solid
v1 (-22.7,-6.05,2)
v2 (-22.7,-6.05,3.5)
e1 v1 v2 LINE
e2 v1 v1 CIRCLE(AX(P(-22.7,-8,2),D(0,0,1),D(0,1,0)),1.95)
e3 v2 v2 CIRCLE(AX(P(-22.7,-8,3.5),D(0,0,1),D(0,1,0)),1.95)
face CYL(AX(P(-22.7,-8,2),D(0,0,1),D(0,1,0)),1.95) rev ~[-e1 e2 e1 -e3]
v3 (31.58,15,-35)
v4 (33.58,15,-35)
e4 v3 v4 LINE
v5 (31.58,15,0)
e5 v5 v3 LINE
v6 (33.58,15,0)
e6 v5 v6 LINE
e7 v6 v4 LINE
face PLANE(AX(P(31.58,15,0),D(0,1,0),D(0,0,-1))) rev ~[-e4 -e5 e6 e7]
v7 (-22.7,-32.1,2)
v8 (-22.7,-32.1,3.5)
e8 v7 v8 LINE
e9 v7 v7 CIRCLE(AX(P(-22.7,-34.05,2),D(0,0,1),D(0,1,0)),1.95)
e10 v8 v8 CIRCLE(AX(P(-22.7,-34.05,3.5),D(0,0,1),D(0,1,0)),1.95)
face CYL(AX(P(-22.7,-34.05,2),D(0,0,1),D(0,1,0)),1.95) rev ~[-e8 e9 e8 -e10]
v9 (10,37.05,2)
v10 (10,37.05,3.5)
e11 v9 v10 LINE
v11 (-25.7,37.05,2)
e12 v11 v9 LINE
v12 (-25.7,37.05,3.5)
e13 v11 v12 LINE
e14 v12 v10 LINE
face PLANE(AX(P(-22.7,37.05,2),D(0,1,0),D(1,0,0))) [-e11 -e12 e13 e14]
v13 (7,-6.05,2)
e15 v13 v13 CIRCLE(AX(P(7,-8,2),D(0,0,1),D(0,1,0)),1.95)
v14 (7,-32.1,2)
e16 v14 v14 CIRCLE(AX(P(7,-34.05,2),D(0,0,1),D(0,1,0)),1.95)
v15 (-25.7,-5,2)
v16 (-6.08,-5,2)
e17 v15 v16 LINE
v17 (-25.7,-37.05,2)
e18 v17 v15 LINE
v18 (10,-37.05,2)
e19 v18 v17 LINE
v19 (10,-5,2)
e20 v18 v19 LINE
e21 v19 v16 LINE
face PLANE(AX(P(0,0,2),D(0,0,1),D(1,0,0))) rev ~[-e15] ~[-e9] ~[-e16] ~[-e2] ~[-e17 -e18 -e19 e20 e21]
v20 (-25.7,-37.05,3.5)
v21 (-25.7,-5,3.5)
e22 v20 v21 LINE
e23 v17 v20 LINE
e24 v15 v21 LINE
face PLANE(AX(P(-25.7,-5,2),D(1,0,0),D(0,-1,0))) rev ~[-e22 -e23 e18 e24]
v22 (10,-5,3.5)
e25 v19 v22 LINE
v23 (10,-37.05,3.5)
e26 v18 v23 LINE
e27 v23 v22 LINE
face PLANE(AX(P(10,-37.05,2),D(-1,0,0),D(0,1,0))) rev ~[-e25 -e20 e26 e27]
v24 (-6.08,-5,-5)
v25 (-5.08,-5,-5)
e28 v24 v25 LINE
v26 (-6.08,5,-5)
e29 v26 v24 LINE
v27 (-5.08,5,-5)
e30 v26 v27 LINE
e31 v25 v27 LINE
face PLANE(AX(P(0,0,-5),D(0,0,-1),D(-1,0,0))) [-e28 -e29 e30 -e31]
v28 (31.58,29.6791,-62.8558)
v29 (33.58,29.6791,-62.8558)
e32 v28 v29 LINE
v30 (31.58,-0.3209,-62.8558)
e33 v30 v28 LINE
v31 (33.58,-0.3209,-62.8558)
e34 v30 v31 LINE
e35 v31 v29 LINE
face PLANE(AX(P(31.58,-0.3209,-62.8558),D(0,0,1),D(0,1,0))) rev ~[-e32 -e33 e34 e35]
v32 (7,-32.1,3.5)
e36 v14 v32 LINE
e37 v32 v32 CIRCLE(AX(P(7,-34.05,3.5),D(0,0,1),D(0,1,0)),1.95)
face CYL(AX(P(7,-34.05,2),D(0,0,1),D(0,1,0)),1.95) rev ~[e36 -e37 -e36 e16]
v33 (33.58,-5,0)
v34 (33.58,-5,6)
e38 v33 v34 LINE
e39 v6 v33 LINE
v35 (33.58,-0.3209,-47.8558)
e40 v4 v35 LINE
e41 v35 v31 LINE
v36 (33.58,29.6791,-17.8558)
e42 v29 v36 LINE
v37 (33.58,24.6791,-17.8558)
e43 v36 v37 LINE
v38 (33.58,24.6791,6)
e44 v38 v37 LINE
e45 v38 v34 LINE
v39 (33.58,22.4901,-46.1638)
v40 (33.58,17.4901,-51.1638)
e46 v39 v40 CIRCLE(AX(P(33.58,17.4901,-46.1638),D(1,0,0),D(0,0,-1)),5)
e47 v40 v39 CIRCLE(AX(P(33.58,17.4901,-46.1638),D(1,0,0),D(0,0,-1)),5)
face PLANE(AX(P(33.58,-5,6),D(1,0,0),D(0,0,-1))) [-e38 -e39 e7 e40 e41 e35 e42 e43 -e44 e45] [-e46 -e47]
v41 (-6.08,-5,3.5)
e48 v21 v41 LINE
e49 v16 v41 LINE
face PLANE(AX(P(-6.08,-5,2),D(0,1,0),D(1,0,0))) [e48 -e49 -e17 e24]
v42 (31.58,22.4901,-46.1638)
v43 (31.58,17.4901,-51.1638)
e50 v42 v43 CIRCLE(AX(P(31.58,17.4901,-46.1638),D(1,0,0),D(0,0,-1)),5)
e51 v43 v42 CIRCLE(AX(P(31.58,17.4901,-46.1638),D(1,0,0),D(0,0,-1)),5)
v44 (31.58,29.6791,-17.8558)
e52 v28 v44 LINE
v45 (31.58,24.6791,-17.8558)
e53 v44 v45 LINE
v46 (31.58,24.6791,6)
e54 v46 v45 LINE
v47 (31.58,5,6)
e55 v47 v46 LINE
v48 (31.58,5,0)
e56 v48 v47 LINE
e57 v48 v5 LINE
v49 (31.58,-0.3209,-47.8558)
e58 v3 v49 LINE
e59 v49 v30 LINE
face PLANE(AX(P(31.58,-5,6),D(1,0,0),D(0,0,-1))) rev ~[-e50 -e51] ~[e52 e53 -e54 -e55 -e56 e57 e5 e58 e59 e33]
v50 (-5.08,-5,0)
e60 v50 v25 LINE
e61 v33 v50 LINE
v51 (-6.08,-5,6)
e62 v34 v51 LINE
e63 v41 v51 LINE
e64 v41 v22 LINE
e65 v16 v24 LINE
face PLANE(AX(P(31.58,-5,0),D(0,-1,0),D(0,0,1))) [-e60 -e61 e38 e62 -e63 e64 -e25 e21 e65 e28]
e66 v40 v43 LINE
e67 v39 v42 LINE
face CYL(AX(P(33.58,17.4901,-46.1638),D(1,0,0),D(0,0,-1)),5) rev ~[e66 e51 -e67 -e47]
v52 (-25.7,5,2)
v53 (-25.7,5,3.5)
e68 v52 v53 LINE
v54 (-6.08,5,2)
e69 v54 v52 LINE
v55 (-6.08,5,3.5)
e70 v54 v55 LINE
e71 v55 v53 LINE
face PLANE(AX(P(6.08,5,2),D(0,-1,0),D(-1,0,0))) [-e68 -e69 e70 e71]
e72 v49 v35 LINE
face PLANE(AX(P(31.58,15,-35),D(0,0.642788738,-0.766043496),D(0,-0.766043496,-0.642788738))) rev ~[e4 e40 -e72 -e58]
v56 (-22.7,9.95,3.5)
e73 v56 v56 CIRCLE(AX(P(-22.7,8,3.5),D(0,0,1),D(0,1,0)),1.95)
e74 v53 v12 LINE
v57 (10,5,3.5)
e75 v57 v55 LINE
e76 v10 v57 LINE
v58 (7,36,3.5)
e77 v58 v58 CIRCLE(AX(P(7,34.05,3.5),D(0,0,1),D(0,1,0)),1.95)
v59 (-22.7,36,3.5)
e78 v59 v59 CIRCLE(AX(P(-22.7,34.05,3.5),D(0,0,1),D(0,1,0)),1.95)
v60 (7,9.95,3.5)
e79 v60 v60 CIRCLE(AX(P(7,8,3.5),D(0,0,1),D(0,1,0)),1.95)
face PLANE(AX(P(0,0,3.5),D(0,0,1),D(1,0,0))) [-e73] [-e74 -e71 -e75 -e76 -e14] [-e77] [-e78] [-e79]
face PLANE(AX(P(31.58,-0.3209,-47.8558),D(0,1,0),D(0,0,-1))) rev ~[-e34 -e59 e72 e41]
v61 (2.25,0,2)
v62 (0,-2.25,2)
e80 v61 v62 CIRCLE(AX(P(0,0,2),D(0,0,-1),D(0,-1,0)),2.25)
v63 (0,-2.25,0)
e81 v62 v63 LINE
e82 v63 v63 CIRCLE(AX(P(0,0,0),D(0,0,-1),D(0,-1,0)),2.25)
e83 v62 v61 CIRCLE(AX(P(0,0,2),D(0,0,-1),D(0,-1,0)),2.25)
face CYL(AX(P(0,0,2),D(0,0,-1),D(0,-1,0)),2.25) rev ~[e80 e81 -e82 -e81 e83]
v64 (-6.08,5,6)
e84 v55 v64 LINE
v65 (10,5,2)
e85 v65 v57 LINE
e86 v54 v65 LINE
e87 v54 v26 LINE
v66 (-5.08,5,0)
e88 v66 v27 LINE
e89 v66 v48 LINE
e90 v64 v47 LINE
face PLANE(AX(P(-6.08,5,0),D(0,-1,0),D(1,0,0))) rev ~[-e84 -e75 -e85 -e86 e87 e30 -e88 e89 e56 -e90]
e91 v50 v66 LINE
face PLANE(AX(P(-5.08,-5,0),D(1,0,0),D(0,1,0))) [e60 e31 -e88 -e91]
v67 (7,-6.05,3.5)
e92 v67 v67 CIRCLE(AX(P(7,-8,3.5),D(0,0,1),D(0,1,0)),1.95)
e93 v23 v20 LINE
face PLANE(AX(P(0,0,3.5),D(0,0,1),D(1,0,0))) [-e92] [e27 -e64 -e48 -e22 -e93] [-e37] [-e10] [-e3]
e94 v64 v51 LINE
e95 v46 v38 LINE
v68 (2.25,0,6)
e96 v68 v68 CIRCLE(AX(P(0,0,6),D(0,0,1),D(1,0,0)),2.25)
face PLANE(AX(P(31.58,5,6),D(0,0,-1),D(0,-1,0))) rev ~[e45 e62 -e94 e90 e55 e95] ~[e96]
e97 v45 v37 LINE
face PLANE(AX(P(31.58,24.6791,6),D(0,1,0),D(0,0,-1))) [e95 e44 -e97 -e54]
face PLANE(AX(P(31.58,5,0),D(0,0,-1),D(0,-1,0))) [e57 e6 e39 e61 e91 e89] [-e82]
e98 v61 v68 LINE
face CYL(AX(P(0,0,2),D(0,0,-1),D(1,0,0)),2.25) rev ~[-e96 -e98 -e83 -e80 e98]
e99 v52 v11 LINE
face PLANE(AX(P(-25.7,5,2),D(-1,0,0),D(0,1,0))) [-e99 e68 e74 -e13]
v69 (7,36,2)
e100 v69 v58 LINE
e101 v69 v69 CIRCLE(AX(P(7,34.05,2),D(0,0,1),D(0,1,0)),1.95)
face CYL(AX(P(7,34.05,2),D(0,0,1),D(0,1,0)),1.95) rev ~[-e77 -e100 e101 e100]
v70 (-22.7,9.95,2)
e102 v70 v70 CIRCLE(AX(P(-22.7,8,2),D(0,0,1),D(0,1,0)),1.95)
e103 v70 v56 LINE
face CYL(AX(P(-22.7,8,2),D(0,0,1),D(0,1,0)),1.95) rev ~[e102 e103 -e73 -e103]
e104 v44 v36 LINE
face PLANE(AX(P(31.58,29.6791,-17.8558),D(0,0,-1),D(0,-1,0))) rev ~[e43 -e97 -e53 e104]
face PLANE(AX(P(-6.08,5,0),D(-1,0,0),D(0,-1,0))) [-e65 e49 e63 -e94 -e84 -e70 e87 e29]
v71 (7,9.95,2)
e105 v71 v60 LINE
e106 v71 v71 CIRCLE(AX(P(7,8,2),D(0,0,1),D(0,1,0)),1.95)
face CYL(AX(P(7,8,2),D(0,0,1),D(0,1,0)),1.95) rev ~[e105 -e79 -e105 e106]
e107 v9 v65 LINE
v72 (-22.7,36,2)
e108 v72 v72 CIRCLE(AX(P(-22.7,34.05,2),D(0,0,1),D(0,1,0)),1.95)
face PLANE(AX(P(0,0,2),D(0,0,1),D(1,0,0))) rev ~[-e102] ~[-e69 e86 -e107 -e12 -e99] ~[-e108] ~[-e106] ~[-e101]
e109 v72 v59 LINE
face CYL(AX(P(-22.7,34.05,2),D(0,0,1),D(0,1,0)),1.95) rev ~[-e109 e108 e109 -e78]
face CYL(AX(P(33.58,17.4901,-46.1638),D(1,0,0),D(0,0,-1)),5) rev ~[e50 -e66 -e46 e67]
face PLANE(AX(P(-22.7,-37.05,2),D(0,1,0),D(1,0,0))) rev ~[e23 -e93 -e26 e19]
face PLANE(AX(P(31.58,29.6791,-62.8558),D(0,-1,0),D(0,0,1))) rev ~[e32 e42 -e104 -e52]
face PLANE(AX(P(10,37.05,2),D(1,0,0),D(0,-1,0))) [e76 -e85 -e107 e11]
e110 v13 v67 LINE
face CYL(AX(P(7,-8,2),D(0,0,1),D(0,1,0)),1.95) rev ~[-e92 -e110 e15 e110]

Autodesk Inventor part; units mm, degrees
ref_plane "YZ Plane" through (0, 0, 0) normal (1, 0, 0) x (0, 1, 0)
ref_plane "XZ Plane" through (0, 0, 0) normal (0, 1, 0) x (-1, 0, 0)
ref_plane "XY Plane" through (0, 0, 0) normal (0, 0, 1) x (1, 0, 0)
sketch "Sketch14" plane through (0, 0, 0) normal (0, 0, 1) x (1, 0, 0)
  line L0 (0, 0) -> (-6.08, 0)
  line L1 (-6.08, 0) -> (0, 0)
  line L2 (0, 0) -> (6.08, 0)
  line L3 (-6.08, 0) -> (-6.08, 5)
  line L4 (-6.08, 0) -> (-1.08, 0) construction
  line L5 (-6.08, 5) -> (6.08, 5)
  line L6 (6.08, 5) -> (6.08, -5)
  line L7 (6.08, -5) -> (-6.08, -5)
  line L8 (-6.08, -5) -> (-6.08, 5)
  dimension "d66" = 6.08
  dimension "d67" = 6.08
  dimension "d68" = 5
  dimension "d69" = 90
  dimension "d70" = 12.16
  dimension "d71" = 10
extrude "Extrusion7" add sketch "Sketch14" along normal blind 2
sketch "Sketch15" plane through (0, 0, 2) normal (0, 0, 1) x (1, 0, 0)
  circle A0 centre (0, 0) radius 1.0665
hole "Hole4" at (0, 0, 2) direction (0, 0, -1) diameter 4.5 end through all clearance for "Flat Head Machine Screw" size "M4" standard "Ansi Metric M Profile"
sketch "Sketch16" plane through (0, 0, 2) normal (0, 0, 1) x (1, 0, 0)
  line L0 (6.08, 5) -> (-6.08, 5) projected
  line L1 (0, 5) -> (10, 5)
  line L2 (10, 5) -> (-25.7, 5)
  line L3 (-25.7, 5) -> (-25.7, 37.05)
  line L4 (-25.7, 37.05) -> (10, 37.05)
  line L5 (10, 37.05) -> (10, 5)
  line L6 (-6.08, -5) -> (6.08, -5) projected
  line L7 (0, -5) -> (10, -5)
  line L8 (10, -5) -> (-25.7, -5)
  line L9 (-25.7, -5) -> (-25.7, -37.05)
  line L10 (-25.7, -37.05) -> (10, -37.05)
  line L11 (10, -37.05) -> (10, -5)
  line L12 (-25.7, 37.05) -> (-22.7, 37.05)
  line L13 (-22.7, 37.05) -> (-22.7, 34.05)
  line L14 (-22.7, 34.05) -> (-25.7, 34.05)
  line L15 (-25.7, 34.05) -> (-25.7, 37.05)
  line L16 (-22.7, 34.05) -> (7, 34.05)
  line L17 (7, 34.05) -> (7, 8)
  line L18 (7, 8) -> (-22.7, 8)
  line L19 (-22.7, 8) -> (-22.7, 34.05)
  line L20 (-25.7, -37.05) -> (-22.7, -37.05)
  line L21 (-22.7, -37.05) -> (-22.7, -34.05)
  line L22 (-22.7, -34.05) -> (-25.7, -34.05)
  line L23 (-25.7, -34.05) -> (-25.7, -37.05)
  line L24 (-22.7, -34.05) -> (7, -34.05)
  line L25 (7, -34.05) -> (7, -8)
  line L26 (7, -8) -> (-22.7, -8)
  line L27 (-22.7, -8) -> (-22.7, -34.05)
  line L28 (-25.7, -5) -> (10, -5)
  line L29 (10, -5) -> (10, -37.05)
  line L30 (10, -37.05) -> (-25.7, -37.05)
  line L31 (-25.7, -37.05) -> (-25.7, -5)
  point P0 (0, 0)
  dimension "d81" = 10
  dimension "d82" = 35.7
  dimension "d83" = 32.05
  dimension "d84" = 35.7
  dimension "d85" = 32.05
  dimension "d86" = 3
  dimension "d87" = 3
  dimension "d88" = 29.7
  dimension "d89" = 26.05
  dimension "d90" = 3
  dimension "d91" = 3
  dimension "d92" = 29.7
  dimension "d93" = 26.05
  dimension "d172" = 10
extrude "Extrusion8" add sketch "Sketch16" along normal blind 1.5 contours L16 L17 L18 L19 | L0 L2 L3 L14 L13 L4 L5 L1 | L13 L14 L3 L4 | L27 L26 L25 L24 | L6 L7 L11 L10 L21 L22 L9 L8 | L22 L21 L10 L9
hole "Hole5" at (-22.7, 34.05, 2) at (-22.7, 8, 2) at (7, 8, 2) at (7, 34.05, 2) at (7, -8, 2) at (7, -34.05, 2) at (-22.7, -34.05, 2) at (-22.7, -8, 2) direction (0, 0, 1) diameter 3.9 end through all clearance for "Flat Head Machine Screw" size "M3.5" standard "Ansi Metric M Profile"
sketch "Sketch17" plane through (0, 0, 2) normal (0, 0, 1) x (1, 0, 0)
  circle A0 centre (0, 0) radius 2.25 projected
  line L0 (6.08, -5) -> (6.08, 5) projected
  line L1 (6.08, 5) -> (-6.08, 5) projected
  line L2 (-6.08, 5) -> (-6.08, -5) projected
  line L3 (-6.08, -5) -> (6.08, -5) projected
extrude "Extrusion9" add sketch "Sketch17" along normal blind 4
sketch "Sketch18" plane through (6.08, -5, 0) normal (1, 0, 0) x (0, 0, -1)
  line L0 (0, 0) -> (0, 10) projected
  line L1 (0, 10) -> (-2, 10) projected
  line L2 (-3.5, 10) -> (-2, 10) projected
  line L3 (-3.5, 10) -> (-6, 10) projected
  line L4 (-6, 0) -> (-6, 10) projected
  line L5 (-3.5, 0) -> (-6, 0) projected
  line L6 (-2, 0) -> (-3.5, 0) projected
  line L7 (0, 0) -> (-2, 0) projected
  point P0 (0, 5)
extrude "Extrusion10" add sketch "Sketch18" along normal blind 35
sketch "Sketch19" plane through (41.08, -5, 0) normal (1, 0, 0) x (0, 0, -1)
  line L0 (-6, 10) -> (-6, 0) projected
  line L1 (-6, 0) -> (-16, 0)
  line L2 (-16, 0) -> (-16, 50)
  line L3 (-16, 50) -> (29, 50)
  line L4 (29, 50) -> (29, 25)
  line L5 (29, 25) -> (0, 10)
  line L6 (0, 10) -> (0, 0) projected
  line L7 (0, 10) -> (0, 0)
  line L8 (0, 0) -> (-6, 0)
  point P0 (0, 5)
  dimension "d107" = 10
  dimension "d108" = 50
  dimension "d109" = 90
  dimension "d110" = 45
  dimension "d111" = 90
  dimension "d112" = 25
extrude "Extrusion11" add sketch "Sketch19" along normal blind 2.5
sketch "Sketch21" plane through (43.58, -5, 0) normal (1, 0, 0) x (0, 0, -1)
  line L0 (-3.5, 10) -> (-6, 10) projected
  line L1 (0, 10) -> (0, 24.05)
  line L2 (0, 10) -> (14.05, 10) construction
  line L3 (0, 24.05) -> (6.713, 24.05)
  point P0 (0, 5)
  point P1 (3, 10)
  point P2 (-2, 10)
  dimension "d118" = 14.05
  dimension "d119" = 90
  dimension "d120" = 6.713
  dimension "d121" = 90
hole "Hole6" at (43.58, 19.05, -6.713) direction (-1, 0, 0) diameter 10 end through all
sketch "Sketch22" plane through (43.58, -5, 0) normal (1, 0, 0) x (0, 0, -1)
  circle A0 centre (6.713, 24.05) radius 5 projected
  line L0 (6.713, 24.05) -> (6.713, 32.05)
  line L1 (6.713, 24.05) -> (14.713, 24.05) construction
  line L2 (6.713, 32.05) -> (24.213, 32.05)
  line L3 (24.213, 32.05) -> (-10.787, 32.05)
  point P0 (0, 5)
  dimension "d129" = 8
  dimension "d130" = 90
  dimension "d131" = 17.5
  dimension "d132" = 90
  dimension "d133" = 35
hole "Hole7" at (43.58, 27.05, 10.787) at (43.58, 27.05, -24.213) direction (-1, 0, 0) diameter 4.2 end through all
sketch "Sketch23" plane through (43.58, -5, 0) normal (1, 0, 0) x (0, 0, -1)
  line L0 (-3.5, 0) -> (-2, 0) projected
  line L1 (-2, 0) -> (-2, -9)
  line L2 (-2, 0) -> (7, 0) construction
  line L3 (-2, -9) -> (33, -9) construction
  line L4 (-2, -9) -> (33, -9)
  line L5 (-2, -9) -> (33, -9) construction
  line L6 (33, -9) -> (40.7782, -1.2218)
  line L7 (40.7782, -1.2218) -> (60.7782, -1.2218)
  line L8 (33, -9) -> (68, -9)
  line L9 (33, -9) -> (68, -9) construction
  line L10 (68, -9) -> (68, -1.2218)
  line L11 (68, -1.2218) -> (60.7782, -1.2218)
  line L12 (68, -9) -> (68, -29)
  line L13 (68, -9) -> (88, -9) construction
  line L14 (68, -29) -> (-2, -29)
  line L15 (-2, -29) -> (-2, -9)
  line L16 (33, -9) -> (44.45, -9)
  line L17 (44.45, -9) -> (44.45, -13.669)
  line L18 (44.45, -9) -> (49.119, -9) construction
  line L19 (44.45, -13.669) -> (44.45, -21.669)
  line L20 (44.45, -21.669) -> (61.95, -21.669)
  line L21 (61.95, -21.669) -> (26.95, -21.669)
  circle A0 centre (26.95, -21.669) radius 2.1
  circle A1 centre (61.95, -21.669) radius 2.1
  circle A2 centre (44.45, -13.669) radius 5
  point P0 (0, 5)
  dimension "d141" = 9
  dimension "d142" = 90
  dimension "d145" = 35
  dimension "d146" = 0
  dimension "d147" = 11
  dimension "d148" = 135
  dimension "d149" = 20
  dimension "d150" = 35
  dimension "d151" = 0
  dimension "d152" = 20
  dimension "d153" = 90
  dimension "d154" = 90
  dimension "d155" = 11.45
  dimension "d156" = 4.669
  dimension "d157" = 90
  dimension "d158" = 8
  dimension "d159" = 17.5
  dimension "d160" = 35
  dimension "d161" = 4.2
  dimension "d162" = 4.2
  dimension "d163" = 10
extrude "Extrusion13" add sketch "Sketch23" against normal blind 2 contours L4 L8 A2 L12 L14 L15 | L6 L7 L11 L10 L8 A2
sketch "Sketch24" plane through (43.58, -5, 0) normal (1, 0, 0) x (0, 0, -1)
  line L0 (-16, 50) -> (-16, 0) projected
  line L1 (-16, 0) -> (-16, -29)
  line L2 (68, -29) -> (-2, -29) projected
  line L3 (-16, -29) -> (-2, -29)
  line L4 (0, 0) -> (-2, 0) projected
  line L5 (-2, -29) -> (-2, 0)
  line L6 (-16, 0) -> (0, 0) projected
  line L7 (-2, 0) -> (-16, 0)
  point P0 (0, 5)
  point P1 (3, 0)
extrude "Extrusion14" add sketch "Sketch24" against normal blind 2
sketch "Sketch25" plane through (41.58, -5, 0) normal (-1, 0, 0) x (0, 0, 1)
  line L0 (2, -9) -> (-33, -9) projected
  line L1 (-33, -9) -> (2, -9)
  line L2 (2, -9) -> (2, -11)
  line L3 (2, -11) -> (-33, -11)
  line L4 (-33, -11) -> (-33, -9)
  line L5 (2, -11) -> (6, -11)
  line L6 (6, -11) -> (6, 0)
  line L7 (6, 0) -> (2, 0)
  line L8 (2, 0) -> (2, -11)
  point P0 (0, 5)
  point P1 (2, -9)
  dimension "d168" = 35
  dimension "d169" = 2
extrude "Extrusion15" add sketch "Sketch25" along normal blind 10
sketch "Sketch27" plane through (43.58, -5, 0) normal (1, 0, 0) x (0, 0, -1)
  line L0 (68, -29) -> (-16, -29) projected
  line L1 (-16, -29) -> (69.4034, -29)
  line L2 (69.4034, -29) -> (69.4034, 52.4533)
  line L3 (69.4034, 52.4533) -> (-16, 52.4533)
  line L4 (-16, 52.4533) -> (-16, -29)
  point P0 (0, 5)
extrude "Extrusion17" cut sketch "Sketch27" against normal up to surface (12 mm away)
sketch "Sketch28" plane through (0, 0, 0) normal (0, 0, -1) x (-1, 0, 0)
  line L0 (6.08, -5) -> (-10, -5) projected
  line L1 (6.08, 5) -> (-10, 5) projected
  line L2 (6.08, -5) -> (5.08, -5)
  line L3 (5.08, -5) -> (5.08, 5)
  line L4 (5.08, 5) -> (6.08, 5)
  line L5 (6.08, 5) -> (6.08, -5)
  point P0 (0, 0)
  dimension "d177" = 1
extrude "Extrusion18" add sketch "Sketch28" along normal blind 5
sketch "Sketch29" plane through (31.58, -5, 6) normal (1, 0, 0) x (0, 0, -1)
  line L0 (6, 10) -> (6, 20)
  line L1 (6, 20) -> (41, 20)
  line L2 (6, 20) -> (41, 20) construction
  line L3 (41, 20) -> (53.8558, 4.6791)
  line L4 (53.8558, 4.6791) -> (68.8558, 4.6791)
  line L5 (68.8558, 4.6791) -> (68.8558, 34.6791)
  line L6 (68.8558, 34.6791) -> (23.8558, 34.6791)
  line L7 (68.8558, 34.6791) -> (113.8558, 34.6791) construction
  line L8 (23.8558, 34.6791) -> (23.8558, 29.6791)
  line L9 (0, 10) -> (0, 0) projected
  line L10 (0, 10) -> (0, 29.6791)
  line L11 (0, 29.6791) -> (23.8558, 29.6791)
  line L12 (6, 10) -> (6, 0)
  line L13 (6, 0) -> (0, 0)
  line L14 (0, 0) -> (0, 10)
  point P0 (6, 5)
  dimension "d180" = 10
  dimension "d181" = 35
  dimension "d182" = 0
  dimension "d183" = 20
  dimension "d184" = 130
  dimension "d185" = 15
  dimension "d186" = 30
  dimension "d187" = 45
  dimension "d188" = 180
  dimension "d189" = 5
  dimension "d190" = 90
extrude "Extrusion19" add sketch "Sketch29" along normal blind 2
sketch "Sketch30" plane through (33.58, -5, 6) normal (1, 0, 0) x (0, 0, -1)
  line L0 (68.8558, 4.6791) -> (68.8558, 34.6791) projected
  line L1 (68.8558, 34.6791) -> (52.1638, 34.6791)
  line L2 (68.8558, 34.6791) -> (23.8558, 34.6791) projected
  line L3 (52.1638, 34.6791) -> (52.1638, 22.4901)
  circle A0 centre (52.1638, 22.4901) radius 5
  point P0 (6, 5)
  dimension "d193" = 16.692
  dimension "d194" = 12.189
  dimension "d195" = 10
extrude "Extrusion20" cut sketch "Sketch30" against normal blind 10
properties part number "Shelf_half"
